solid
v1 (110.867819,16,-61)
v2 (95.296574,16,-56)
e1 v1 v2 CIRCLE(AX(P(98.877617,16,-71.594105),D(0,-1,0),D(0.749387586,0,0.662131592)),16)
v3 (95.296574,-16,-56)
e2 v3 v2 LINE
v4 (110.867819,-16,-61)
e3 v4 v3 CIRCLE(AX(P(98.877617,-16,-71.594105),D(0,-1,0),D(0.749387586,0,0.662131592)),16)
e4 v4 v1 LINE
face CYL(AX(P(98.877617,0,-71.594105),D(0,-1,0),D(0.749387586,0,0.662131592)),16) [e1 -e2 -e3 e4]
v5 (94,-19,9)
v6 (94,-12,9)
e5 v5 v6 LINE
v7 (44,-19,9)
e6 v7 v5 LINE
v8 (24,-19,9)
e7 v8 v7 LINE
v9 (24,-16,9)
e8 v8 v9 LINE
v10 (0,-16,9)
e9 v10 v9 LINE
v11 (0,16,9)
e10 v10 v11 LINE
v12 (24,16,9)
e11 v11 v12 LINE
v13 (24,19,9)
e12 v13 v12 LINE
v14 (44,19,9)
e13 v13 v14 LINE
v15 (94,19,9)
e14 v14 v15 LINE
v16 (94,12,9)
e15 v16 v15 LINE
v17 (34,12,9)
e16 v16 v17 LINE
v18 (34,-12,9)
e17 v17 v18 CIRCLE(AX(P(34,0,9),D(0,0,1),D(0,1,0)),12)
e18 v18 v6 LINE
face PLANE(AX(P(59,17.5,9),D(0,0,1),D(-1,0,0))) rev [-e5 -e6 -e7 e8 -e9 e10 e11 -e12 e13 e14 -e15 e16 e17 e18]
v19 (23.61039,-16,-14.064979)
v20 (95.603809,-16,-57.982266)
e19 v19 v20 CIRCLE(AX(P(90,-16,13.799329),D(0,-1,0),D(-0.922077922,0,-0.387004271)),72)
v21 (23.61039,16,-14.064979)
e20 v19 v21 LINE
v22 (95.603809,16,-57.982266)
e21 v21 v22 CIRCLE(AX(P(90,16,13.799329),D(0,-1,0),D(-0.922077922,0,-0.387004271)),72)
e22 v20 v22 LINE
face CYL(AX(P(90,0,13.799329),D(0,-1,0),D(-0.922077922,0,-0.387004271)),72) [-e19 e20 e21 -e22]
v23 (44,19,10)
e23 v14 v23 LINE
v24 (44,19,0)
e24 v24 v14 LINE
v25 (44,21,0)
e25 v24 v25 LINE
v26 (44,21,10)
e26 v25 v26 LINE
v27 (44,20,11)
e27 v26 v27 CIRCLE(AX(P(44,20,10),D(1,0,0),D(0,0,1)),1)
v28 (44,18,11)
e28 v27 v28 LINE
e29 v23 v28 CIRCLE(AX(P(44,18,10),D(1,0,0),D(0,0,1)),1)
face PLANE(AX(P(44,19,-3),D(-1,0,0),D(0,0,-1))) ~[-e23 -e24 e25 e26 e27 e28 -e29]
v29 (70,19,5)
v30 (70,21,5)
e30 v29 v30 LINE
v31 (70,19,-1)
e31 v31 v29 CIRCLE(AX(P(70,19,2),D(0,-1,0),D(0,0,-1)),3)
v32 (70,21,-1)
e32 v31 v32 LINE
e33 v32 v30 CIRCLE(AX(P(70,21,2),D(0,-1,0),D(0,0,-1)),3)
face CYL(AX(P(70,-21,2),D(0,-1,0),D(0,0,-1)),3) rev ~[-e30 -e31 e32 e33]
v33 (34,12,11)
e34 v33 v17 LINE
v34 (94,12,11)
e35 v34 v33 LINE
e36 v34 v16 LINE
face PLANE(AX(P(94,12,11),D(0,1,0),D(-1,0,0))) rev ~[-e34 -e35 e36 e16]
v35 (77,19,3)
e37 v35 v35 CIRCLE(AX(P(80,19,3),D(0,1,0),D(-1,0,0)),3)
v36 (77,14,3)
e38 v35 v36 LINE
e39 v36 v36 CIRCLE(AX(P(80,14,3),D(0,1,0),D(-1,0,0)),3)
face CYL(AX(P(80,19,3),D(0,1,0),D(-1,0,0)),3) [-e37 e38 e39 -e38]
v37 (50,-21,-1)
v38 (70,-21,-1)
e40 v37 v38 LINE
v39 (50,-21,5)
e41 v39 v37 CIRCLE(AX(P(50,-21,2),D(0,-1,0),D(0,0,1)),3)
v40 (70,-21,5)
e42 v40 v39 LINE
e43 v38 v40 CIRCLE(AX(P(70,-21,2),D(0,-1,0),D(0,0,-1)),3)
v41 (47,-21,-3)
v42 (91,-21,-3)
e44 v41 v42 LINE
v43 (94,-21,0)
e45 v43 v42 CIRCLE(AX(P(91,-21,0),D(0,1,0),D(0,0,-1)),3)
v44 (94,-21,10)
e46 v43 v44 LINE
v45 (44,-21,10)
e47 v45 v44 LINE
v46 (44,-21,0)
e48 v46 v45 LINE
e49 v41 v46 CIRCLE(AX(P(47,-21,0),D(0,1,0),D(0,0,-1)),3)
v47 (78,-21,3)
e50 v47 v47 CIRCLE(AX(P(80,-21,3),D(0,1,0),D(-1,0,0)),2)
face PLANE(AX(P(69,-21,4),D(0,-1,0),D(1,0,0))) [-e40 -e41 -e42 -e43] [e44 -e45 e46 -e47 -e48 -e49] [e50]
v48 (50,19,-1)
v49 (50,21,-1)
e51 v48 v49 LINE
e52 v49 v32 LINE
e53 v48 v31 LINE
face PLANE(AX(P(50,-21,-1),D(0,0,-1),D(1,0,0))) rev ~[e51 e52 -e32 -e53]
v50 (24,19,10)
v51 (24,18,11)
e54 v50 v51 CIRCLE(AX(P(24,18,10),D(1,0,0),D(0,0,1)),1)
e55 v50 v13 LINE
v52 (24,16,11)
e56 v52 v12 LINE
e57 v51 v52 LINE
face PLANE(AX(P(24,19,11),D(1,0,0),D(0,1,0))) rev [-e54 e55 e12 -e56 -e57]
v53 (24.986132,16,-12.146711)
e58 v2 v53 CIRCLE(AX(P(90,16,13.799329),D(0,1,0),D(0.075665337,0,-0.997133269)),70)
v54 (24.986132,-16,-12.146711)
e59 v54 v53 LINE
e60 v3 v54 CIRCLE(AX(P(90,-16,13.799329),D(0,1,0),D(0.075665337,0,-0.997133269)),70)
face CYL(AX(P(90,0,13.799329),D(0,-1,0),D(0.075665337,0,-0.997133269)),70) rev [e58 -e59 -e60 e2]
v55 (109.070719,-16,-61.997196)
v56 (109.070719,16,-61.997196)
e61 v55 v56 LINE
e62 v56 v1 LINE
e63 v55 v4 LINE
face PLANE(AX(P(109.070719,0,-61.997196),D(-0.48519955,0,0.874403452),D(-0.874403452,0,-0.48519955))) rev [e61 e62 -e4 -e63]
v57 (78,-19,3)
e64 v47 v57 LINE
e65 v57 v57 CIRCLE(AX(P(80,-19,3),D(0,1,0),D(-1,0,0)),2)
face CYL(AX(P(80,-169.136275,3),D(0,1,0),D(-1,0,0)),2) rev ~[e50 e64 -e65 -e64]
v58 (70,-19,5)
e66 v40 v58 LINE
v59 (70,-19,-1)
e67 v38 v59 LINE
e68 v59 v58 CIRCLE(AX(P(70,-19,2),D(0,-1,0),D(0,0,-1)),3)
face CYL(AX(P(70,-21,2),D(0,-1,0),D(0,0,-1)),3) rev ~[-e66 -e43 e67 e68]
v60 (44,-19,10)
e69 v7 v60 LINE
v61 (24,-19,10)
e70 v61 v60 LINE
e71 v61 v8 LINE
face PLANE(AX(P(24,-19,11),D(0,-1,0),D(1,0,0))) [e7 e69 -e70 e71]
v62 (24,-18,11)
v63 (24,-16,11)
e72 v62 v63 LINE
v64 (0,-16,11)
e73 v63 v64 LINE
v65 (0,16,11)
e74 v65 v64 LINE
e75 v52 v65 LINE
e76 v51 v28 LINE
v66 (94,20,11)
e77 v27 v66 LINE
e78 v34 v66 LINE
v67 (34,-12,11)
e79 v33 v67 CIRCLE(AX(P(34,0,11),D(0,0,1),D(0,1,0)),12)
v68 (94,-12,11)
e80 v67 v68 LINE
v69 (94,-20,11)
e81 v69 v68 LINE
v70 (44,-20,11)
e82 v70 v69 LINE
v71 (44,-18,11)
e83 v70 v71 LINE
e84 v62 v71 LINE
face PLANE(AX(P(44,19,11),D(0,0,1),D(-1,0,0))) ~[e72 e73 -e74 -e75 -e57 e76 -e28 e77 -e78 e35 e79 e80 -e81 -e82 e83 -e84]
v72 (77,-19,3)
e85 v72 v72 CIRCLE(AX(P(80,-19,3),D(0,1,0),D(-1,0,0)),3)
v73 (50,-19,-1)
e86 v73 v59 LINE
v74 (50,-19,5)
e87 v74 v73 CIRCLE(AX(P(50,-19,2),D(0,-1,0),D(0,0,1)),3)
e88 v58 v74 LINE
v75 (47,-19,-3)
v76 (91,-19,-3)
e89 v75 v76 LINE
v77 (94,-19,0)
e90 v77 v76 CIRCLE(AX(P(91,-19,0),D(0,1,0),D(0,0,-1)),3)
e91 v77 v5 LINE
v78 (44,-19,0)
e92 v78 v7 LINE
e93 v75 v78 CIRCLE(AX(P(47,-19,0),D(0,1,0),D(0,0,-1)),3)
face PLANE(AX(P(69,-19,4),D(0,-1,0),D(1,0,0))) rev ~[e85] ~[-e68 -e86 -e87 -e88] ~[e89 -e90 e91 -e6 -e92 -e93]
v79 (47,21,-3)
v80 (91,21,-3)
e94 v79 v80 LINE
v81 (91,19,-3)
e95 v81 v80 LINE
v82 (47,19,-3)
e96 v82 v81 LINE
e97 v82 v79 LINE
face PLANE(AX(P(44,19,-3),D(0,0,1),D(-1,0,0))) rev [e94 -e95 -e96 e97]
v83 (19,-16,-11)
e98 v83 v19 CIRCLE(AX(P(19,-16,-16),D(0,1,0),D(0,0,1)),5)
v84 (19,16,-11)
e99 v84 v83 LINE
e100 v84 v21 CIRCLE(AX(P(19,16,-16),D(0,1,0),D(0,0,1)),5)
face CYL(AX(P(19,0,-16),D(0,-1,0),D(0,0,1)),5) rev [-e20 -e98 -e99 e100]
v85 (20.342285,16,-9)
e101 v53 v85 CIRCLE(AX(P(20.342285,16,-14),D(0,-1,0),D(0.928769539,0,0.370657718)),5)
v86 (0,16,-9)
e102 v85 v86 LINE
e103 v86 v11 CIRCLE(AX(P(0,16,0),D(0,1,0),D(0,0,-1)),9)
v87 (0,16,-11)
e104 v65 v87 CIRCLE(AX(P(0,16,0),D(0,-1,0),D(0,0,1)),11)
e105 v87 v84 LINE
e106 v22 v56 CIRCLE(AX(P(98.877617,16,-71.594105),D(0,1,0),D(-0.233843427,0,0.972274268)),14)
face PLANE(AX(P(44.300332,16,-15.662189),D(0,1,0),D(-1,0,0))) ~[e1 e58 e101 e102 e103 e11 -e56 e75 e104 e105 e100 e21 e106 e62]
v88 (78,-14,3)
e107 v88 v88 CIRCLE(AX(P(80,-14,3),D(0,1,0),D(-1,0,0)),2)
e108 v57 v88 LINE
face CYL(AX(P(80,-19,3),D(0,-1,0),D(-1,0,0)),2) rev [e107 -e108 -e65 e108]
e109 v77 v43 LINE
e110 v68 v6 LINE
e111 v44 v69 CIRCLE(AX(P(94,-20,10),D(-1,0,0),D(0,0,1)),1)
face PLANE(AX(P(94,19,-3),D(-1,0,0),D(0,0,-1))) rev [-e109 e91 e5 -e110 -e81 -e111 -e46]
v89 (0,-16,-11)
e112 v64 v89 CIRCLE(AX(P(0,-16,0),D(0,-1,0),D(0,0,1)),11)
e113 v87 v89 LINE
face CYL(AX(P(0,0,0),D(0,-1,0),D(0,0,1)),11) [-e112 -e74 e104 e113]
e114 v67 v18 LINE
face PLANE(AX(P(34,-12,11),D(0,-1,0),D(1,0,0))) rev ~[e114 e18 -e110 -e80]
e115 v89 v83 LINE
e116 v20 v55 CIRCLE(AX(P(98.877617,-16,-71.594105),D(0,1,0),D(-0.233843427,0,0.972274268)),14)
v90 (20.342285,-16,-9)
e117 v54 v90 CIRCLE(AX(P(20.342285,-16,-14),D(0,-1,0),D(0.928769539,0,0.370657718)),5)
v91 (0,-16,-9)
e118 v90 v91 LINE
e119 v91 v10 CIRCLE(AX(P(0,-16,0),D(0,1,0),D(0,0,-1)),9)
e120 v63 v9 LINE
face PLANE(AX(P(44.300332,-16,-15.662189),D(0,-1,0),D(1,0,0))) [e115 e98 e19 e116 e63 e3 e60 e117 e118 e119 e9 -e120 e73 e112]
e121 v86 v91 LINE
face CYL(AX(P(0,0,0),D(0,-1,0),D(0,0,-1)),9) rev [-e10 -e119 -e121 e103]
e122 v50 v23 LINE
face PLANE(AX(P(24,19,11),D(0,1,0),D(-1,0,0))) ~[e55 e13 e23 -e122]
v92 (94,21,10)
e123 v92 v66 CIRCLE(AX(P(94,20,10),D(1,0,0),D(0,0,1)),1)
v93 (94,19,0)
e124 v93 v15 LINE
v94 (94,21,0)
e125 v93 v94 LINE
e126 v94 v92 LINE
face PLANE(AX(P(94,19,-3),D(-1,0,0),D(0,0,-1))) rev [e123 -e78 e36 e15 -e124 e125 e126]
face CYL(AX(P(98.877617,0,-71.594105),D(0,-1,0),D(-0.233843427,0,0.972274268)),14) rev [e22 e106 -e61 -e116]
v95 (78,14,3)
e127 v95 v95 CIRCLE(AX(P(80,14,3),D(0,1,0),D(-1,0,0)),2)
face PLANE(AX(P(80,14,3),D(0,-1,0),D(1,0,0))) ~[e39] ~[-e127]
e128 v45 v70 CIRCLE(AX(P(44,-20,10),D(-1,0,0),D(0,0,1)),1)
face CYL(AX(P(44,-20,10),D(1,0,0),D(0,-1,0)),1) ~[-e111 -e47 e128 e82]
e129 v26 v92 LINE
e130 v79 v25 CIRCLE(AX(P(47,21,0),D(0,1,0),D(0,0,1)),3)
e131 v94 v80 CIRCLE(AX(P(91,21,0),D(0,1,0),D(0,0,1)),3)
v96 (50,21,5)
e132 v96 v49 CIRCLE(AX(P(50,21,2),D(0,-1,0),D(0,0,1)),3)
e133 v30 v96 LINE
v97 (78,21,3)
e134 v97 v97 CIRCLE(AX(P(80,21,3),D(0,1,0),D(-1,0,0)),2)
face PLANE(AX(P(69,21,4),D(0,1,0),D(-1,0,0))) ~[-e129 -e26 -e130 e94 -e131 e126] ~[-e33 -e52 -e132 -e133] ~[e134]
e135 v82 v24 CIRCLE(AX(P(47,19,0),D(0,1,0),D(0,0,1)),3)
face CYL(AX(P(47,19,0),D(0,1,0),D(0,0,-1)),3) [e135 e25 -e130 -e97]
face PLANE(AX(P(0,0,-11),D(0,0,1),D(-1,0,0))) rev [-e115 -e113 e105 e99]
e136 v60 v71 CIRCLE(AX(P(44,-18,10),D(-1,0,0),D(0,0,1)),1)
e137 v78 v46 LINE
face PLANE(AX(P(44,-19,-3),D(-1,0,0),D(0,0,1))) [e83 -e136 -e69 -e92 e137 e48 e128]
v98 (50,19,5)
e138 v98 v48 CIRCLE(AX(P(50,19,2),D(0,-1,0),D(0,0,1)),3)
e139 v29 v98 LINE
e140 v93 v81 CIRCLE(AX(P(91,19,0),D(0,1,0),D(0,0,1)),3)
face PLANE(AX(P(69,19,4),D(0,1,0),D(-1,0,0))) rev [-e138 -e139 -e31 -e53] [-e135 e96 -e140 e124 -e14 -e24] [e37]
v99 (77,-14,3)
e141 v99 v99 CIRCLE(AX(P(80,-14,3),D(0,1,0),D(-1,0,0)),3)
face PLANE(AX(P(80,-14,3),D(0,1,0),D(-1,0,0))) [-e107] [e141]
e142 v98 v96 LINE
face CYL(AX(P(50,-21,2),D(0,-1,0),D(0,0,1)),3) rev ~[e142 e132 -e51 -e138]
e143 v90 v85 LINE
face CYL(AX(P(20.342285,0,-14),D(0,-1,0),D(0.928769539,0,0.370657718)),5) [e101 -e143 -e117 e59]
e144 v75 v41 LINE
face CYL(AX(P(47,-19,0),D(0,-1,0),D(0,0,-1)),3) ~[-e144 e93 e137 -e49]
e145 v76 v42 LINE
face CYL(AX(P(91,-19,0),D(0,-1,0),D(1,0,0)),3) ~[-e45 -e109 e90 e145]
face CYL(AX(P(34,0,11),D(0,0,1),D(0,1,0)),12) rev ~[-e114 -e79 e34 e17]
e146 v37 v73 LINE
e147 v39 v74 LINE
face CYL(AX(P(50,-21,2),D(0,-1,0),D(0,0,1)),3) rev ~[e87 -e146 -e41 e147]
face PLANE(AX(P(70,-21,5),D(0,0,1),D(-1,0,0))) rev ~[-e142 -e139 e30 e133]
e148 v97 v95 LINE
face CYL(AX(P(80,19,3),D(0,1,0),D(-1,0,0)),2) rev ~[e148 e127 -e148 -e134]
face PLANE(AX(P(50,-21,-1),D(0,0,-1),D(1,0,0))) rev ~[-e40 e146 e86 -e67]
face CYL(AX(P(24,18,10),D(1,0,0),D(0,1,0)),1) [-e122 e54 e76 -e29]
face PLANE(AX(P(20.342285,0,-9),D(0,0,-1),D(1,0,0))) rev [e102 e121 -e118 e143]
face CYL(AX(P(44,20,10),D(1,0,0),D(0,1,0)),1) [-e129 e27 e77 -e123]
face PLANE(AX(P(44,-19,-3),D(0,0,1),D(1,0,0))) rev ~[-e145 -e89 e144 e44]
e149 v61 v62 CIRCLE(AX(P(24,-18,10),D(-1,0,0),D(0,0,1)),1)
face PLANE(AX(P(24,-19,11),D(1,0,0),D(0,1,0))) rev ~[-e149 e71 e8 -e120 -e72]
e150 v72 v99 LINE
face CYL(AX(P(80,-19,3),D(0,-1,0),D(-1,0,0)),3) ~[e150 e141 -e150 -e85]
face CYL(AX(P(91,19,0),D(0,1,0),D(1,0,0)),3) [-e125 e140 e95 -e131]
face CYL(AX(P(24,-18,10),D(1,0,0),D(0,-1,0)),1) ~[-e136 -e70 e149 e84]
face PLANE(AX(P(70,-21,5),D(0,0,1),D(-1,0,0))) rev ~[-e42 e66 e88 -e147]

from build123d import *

# Parameters (mm, degrees)
F1_DEPTH  = 16
F2_W      = 70
F2_H      = 3
F3_DEPTH  = 2
F4_W      = 50
F4_H      = 14
F5_DEPTH  = 2
F6_R      = 1
F9_DEPTH  = 2
F11_DEPTH = 42.001
F13_D     = 4
F14_R     = 3
F14_R_2   = 2
F15_DEPTH = 5
F16_R     = 3


# Not quite as in the source:
# - a pattern or mirror of a feature is missing from the dataset's text; its kind, count and spacing are read off the source's solid


with BuildPart() as f1:
    # F0 (on Front) → F1 (new body)
    with BuildSketch(Plane.XZ):
        with BuildLine():
            ThreePointArc((0, -9), (-9, 0), (0, 9))
            Line((0, 9), (94, 9))
            Line((94, 9), (94, 11))
            Line((94, 11), (0, 11))
            ThreePointArc((0, 11), (-11, 0), (0, -11))
            Line((0, -11), (19, -11))
            ThreePointArc((19, -11), (21.7681124643, -11.8361612201), (23.6103896104, -14.064978646))
            ThreePointArc((23.6103896104, -14.064978646), (52.5045279084, -47.666837229), (95.6038093767, -57.9822657286))
            ThreePointArc((95.6038093767, -57.9822657286), (102.8775016632, -58.177663117), (109.0707194958, -61.9971961375))
            Line((109.0707194958, -61.9971961375), (110.8678187413, -61))
            ThreePointArc((110.8678187413, -61), (103.7692922231, -56.3602117831), (95.2965735981, -56))
            ThreePointArc((95.2965735981, -56), (52.955209083, -45.5949761441), (24.9861322889, -12.1467114099))
            ThreePointArc((24.9861322889, -12.1467114099), (23.1470623984, -9.8607704249), (20.3422845953, -9))
            Line((20.3422845953, -9), (0, -9))
        make_face()
    extrude(amount=F1_DEPTH)

    # F2 (on face) → F3 (join)
    with BuildSketch(Plane.XY.offset(11)):
        with Locations((59, -17.5)):
            Rectangle(F2_W, F2_H)
    extrude(amount=-F3_DEPTH)

    # F4 (on face) → F5 (join)
    with BuildSketch(Plane.XZ.offset(19)):
        with Locations((69, 4)):
            Rectangle(F4_W, F4_H)
    extrude(amount=F5_DEPTH)

    # F6
    f6_edges = [f1.edges().sort_by_distance(p)[0] for p in [
        (69, -21, 11),
        (34, -19, 11),
    ]]
    fillet(f6_edges, radius=F6_R)

    # F7: F1 across plane


with BuildPart() as f1_1:
    add(f1.part)
    add(f1.part.mirror(Plane.XZ))

    # F8 (on face) → F9 (cut)
    with BuildSketch(Plane.XY.offset(11)):
        with BuildLine():
            Line((94, 12), (34, 12))
            ThreePointArc((34, 12), (22, 0), (34, -12))
            Line((34, -12), (94, -12))
            Line((94, -12), (94, 12))
        make_face()
    extrude(amount=-F9_DEPTH, mode=Mode.SUBTRACT)

    # F10 (on face) → F11 (cut, through all)
    with BuildSketch(Plane.XZ.offset(21)):
        with BuildLine():
            ThreePointArc((50, 5), (47, 2), (50, -1))
            Line((50, -1), (70, -1))
            ThreePointArc((70, -1), (73, 2), (70, 5))
            Line((70, 5), (50, 5))
        make_face()
    extrude(amount=-F11_DEPTH, mode=Mode.SUBTRACT)

    # F13 (through all)
    with Locations(Plane.XZ.offset(21)):
        with Locations((80, 3)):
            Hole(F13_D / 2)

    # F14 (on face) → F15 (join)
    with BuildSketch(Plane(origin=(0, -19, 0), x_dir=(-1, 0, 0), z_dir=(0, 1, 0))):
        with Locations((-80, 3)):
            Circle(F14_R)
        with Locations((-80, 3)):
            Circle(F14_R_2, mode=Mode.SUBTRACT)
    f15 = extrude(amount=F15_DEPTH)

    # F15_copies: F15 across plane
    add(f15.mirror(Plane.ZX))

    # F16
    f16_edges = [f1_1.edges().sort_by_distance(p)[0] for p in [
        (44, -20, -3),
        (94, -20, -3),
        (94, 20, -3),
        (44, 20, -3),
    ]]
    fillet(f16_edges, radius=F16_R)


solid = f1_1.part
